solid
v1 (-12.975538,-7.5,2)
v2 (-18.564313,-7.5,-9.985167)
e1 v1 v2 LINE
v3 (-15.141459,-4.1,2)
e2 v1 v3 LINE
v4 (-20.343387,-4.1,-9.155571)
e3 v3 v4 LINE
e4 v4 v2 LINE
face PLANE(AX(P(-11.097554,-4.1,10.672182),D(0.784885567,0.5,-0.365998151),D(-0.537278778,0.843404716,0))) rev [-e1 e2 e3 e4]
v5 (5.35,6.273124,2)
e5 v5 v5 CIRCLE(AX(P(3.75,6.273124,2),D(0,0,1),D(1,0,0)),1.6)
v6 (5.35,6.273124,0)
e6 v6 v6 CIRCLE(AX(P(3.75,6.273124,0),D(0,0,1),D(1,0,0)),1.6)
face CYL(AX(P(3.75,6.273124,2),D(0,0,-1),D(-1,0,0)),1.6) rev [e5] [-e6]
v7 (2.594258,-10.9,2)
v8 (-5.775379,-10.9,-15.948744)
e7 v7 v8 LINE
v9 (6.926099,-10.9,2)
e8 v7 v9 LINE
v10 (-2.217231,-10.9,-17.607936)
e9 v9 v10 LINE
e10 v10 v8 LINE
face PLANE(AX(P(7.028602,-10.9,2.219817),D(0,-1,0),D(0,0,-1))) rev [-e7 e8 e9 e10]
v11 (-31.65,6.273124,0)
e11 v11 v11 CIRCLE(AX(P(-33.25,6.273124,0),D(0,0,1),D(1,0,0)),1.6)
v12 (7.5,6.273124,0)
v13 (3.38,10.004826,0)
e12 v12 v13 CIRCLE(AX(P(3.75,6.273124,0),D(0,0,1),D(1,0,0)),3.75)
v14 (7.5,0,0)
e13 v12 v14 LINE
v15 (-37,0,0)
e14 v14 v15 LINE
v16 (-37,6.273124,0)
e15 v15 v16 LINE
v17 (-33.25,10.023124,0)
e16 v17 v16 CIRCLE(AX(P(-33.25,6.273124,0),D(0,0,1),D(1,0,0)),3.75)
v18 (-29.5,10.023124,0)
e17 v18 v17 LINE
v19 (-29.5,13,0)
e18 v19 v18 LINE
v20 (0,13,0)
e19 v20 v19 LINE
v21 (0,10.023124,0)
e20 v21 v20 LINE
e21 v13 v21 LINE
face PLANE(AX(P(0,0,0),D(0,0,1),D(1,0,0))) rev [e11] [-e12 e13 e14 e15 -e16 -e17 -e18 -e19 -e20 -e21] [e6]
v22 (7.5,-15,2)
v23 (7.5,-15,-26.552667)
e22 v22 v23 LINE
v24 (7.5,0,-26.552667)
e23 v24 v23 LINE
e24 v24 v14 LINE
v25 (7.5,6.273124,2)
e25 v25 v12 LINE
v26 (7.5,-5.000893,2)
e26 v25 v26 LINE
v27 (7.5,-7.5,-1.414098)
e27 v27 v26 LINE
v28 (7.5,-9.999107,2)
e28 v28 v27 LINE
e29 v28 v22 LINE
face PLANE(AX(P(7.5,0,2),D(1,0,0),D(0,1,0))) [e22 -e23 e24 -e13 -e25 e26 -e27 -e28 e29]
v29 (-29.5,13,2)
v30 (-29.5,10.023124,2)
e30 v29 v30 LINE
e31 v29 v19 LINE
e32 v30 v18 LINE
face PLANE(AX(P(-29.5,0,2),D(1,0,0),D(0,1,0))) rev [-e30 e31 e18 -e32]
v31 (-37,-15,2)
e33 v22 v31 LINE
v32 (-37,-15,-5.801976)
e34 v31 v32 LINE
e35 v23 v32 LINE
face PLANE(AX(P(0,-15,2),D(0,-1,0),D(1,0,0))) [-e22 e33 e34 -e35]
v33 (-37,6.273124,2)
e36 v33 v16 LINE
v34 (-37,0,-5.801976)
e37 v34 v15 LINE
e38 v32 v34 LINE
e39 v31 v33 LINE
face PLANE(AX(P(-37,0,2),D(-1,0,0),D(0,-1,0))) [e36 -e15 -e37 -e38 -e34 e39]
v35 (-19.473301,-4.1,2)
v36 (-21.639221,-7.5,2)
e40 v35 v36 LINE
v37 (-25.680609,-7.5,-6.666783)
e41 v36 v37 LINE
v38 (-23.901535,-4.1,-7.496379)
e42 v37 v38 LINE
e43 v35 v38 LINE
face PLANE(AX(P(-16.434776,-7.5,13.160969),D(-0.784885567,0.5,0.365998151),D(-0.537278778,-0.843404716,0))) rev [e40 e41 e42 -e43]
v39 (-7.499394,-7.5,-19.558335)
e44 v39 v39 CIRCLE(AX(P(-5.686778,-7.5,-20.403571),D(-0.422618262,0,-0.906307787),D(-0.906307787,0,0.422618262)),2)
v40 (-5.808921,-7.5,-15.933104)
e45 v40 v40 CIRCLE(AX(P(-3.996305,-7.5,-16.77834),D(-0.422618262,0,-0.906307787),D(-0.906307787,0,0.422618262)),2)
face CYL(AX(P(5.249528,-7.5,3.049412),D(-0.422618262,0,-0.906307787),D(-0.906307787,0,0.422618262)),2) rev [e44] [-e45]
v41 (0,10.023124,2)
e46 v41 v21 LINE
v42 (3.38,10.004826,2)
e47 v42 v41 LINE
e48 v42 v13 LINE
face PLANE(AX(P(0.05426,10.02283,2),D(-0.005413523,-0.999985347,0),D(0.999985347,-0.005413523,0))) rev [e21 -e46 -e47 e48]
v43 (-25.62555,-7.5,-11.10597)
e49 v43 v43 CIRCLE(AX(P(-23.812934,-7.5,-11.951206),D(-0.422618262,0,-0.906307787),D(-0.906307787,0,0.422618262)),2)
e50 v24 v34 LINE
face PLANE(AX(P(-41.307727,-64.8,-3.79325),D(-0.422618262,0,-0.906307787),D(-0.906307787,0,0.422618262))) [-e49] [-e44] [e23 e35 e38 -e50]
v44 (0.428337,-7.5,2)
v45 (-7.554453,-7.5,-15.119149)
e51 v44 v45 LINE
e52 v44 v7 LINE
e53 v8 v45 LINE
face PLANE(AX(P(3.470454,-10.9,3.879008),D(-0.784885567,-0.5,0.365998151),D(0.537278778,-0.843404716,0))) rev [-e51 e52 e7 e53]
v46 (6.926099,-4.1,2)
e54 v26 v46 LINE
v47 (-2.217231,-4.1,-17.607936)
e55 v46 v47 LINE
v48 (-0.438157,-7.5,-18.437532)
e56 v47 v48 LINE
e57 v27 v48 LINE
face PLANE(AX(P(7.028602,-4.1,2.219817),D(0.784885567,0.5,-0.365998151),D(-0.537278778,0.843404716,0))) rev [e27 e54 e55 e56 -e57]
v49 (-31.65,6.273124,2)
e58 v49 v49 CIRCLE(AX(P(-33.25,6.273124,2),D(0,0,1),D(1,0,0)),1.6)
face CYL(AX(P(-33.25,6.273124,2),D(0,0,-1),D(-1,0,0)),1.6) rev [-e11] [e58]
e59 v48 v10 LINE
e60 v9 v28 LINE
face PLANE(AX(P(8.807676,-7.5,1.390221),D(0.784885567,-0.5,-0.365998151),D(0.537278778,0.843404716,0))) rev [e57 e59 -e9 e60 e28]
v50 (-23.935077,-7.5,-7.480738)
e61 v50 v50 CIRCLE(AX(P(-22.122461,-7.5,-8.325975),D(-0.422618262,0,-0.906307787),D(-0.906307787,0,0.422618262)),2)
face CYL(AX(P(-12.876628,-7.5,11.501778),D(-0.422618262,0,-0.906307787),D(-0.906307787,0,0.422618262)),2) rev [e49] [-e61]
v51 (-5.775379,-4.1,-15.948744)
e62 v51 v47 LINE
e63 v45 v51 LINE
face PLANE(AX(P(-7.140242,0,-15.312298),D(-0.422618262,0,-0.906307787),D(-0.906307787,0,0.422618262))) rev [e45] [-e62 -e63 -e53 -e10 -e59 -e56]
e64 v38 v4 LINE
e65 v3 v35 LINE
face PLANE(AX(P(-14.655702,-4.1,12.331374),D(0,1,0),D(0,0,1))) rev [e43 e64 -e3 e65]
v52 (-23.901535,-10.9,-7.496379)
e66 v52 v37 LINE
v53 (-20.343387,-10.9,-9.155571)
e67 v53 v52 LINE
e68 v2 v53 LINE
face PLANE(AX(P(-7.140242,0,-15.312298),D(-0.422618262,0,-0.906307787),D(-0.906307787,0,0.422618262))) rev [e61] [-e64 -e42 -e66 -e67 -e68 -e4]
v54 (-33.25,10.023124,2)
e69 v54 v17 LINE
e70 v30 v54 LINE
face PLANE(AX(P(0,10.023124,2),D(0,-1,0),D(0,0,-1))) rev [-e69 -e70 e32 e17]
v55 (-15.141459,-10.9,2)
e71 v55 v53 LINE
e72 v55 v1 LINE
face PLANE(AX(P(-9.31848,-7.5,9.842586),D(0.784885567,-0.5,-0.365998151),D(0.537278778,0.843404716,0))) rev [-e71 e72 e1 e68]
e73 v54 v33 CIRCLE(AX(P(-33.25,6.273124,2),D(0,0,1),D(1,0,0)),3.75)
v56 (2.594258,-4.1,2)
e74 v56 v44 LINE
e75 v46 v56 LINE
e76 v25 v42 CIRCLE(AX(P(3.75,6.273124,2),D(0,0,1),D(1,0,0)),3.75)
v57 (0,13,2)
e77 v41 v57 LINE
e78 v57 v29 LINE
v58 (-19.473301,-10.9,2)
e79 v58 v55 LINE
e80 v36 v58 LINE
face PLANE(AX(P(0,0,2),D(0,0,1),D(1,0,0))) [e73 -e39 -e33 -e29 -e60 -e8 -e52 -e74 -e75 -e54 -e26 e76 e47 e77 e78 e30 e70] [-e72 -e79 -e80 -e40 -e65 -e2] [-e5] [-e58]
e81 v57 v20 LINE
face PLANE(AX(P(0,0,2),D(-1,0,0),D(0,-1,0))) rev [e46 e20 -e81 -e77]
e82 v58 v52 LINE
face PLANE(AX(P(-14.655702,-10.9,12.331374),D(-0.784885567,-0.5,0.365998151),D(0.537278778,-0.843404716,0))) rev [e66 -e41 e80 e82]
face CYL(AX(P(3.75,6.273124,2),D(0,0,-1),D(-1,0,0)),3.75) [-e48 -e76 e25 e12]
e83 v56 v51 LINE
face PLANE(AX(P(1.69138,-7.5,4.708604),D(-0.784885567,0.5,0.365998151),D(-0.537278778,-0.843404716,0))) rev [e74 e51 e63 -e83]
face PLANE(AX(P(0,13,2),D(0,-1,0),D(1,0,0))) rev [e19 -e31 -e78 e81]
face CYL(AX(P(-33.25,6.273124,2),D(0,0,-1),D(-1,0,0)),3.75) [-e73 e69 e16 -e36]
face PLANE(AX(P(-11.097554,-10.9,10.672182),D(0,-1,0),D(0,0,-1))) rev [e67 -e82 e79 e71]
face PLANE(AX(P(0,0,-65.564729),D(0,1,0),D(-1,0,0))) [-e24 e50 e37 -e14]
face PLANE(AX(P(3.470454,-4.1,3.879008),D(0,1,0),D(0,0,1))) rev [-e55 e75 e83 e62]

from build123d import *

# Parameters (mm, degrees)
SKETCH1_R           = 3.75
SKETCH1_R_2         = 1.6
BOSS_EXTRUDE1_DEPTH = 2
BOSS_EXTRUDE2_START = -15
BOSS_EXTRUDE2_DEPTH = 15
BOSS_EXTRUDE3_DEPTH = 2
SKETCH2_R           = 2
CUT_EXTRUDE1_DEPTH  = 39.169212171
CUT_EXTRUDE2_START  = -4
SKETCH2_3_R         = 2
CUT_EXTRUDE2_DEPTH  = 35.169212171


# Read off the part's stored shape, not the designer's step: Boss-Extrude2
with BuildPart() as part:
    # Sketch1 → Boss-Extrude1 (new body)
    # profile 1 of 5: a face of its own
    with BuildSketch(Plane.XY):
        with Locations((-33.25, 6.273123532)):
            Circle(SKETCH1_R)
        with Locations((-33.25, 6.273123532)):
            Circle(SKETCH1_R_2, mode=Mode.SUBTRACT)
    # profile 2 of 5: a face of its own
    with BuildSketch(Plane.XY):
        with BuildLine():
            Line((0, 2.523123532), (3.75, 2.523123532))
            ThreePointArc((3.75, 2.523123532), (0.004577287, 6.087897443), (3.38, 10.004825556))
            Line((3.38, 10.004825556), (0, 10.023123532))
            Line((0, 10.023123532), (0, 13))
            Line((0, 13), (-29.5, 13))
            Line((-29.5, 13), (-29.5, 10.023123532))
            Line((-29.5, 10.023123532), (-33.25, 10.023123532))
            ThreePointArc((-33.25, 10.023123532), (-30.598349571, 8.924773961), (-29.5, 6.273123532))
            ThreePointArc((-29.5, 6.273123532), (-30.598349571, 3.621473102), (-33.25, 2.523123532))
            Line((-33.25, 2.523123532), (-29.5, 2.523123532))
            Line((-29.5, 2.523123532), (-29.5, 0))
            Line((-29.5, 0), (0, 0))
            Line((0, 0), (0, 2.523123532))
        make_face()
    # profile 3 of 5: a face of its own
    with BuildSketch(Plane.XY):
        with Locations((3.75, 6.273123532)):
            Circle(SKETCH1_R)
        with Locations((3.75, 6.273123532)):
            Circle(SKETCH1_R_2, mode=Mode.SUBTRACT)
    # profile 4 of 5: a face of its own
    with BuildSketch(Plane.XY):
        with BuildLine():
            ThreePointArc((7.5, 6.273123532), (6.401650429, 3.621473102), (3.75, 2.523123532))
            Line((3.75, 2.523123532), (0, 2.523123532))
            Line((0, 2.523123532), (0, 0))
            Line((0, 0), (7.5, 0))
            Line((7.5, 0), (7.5, 6.273123532))
        make_face()
    # profile 5 of 5: a face of its own
    with BuildSketch(Plane.XY):
        with BuildLine():
            Line((-37, 0), (-29.5, 0))
            Line((-29.5, 0), (-29.5, 2.523123532))
            Line((-29.5, 2.523123532), (-33.25, 2.523123532))
            ThreePointArc((-33.25, 2.523123532), (-35.901650429, 3.621473102), (-37, 6.273123532))
            Line((-37, 6.273123532), (-37, 0))
        make_face()
    extrude(amount=BOSS_EXTRUDE1_DEPTH)



with BuildPart() as body_2:
    # Boss-Extrude2 outline → Boss-Extrude2 (new body)
    with BuildSketch(Plane(origin=(0, 0, 0), x_dir=(1, 0, 0), z_dir=(0, 1, 0)).offset(BOSS_EXTRUDE2_START)):
        Polygon((7.5, 0), (7.5, 26.552667029), (-37, 5.801976241), (-37, 0), align=None)
    extrude(amount=BOSS_EXTRUDE2_DEPTH)


with BuildPart() as part_1:
    add(part.part)

    add(body_2.part)  # Boss-Extrude3 merges body 2
    # Sketch1<5> → Boss-Extrude3 (add)
    with BuildSketch(Plane.XY):
        Polygon((7.5, 0), (0, 0), (-29.5, 0), (-37, 0), (-37, -15), (7.5, -15), align=None)
    extrude(amount=BOSS_EXTRUDE3_DEPTH)

    # Sketch2 → Cut-Extrude1 (cut, through all)
    with BuildSketch(Plane(origin=(-8.83071505, 0, -18.937529538), x_dir=(-0.9063077870366508, 0, 0.42261826174069766), z_dir=(-0.4226182617406977, 1.198406961524809e-15, -0.9063077870366509))):
        with Locations((16.531049613, -7.5)):
            Circle(SKETCH2_R)
        with Locations((-3.468950387, -7.5)):
            Circle(SKETCH2_R)
    extrude(amount=-CUT_EXTRUDE1_DEPTH, mode=Mode.SUBTRACT)

    # Sketch2<3> → Cut-Extrude2 (cut, through all)
    # profile 1 of 2: a face of its own
    with BuildSketch(Plane(origin=(-8.83071505, 0, -18.937529538), x_dir=(-0.9063077870366508, 0, 0.42261826174069766), z_dir=(-0.4226182617406977, 1.198406961524809e-15, -0.9063077870366509)).offset(CUT_EXTRUDE2_START)):
        Polygon((12.605067782, -7.5), (14.568058697, -10.9), (18.494040528, -10.9), (20.457031443, -7.5), (18.494040528, -4.1), (14.568058697, -4.1), align=None)
        with Locations((16.531049613, -7.5)):
            Circle(SKETCH2_3_R, mode=Mode.SUBTRACT)
    # profile 2 of 2: a face of its own
    with BuildSketch(Plane(origin=(-8.83071505, 0, -18.937529538), x_dir=(-0.9063077870366508, 0, 0.42261826174069766), z_dir=(-0.4226182617406977, 1.198406961524809e-15, -0.9063077870366509)).offset(CUT_EXTRUDE2_START)):
        Polygon((-5.431941303, -4.1), (-7.394932218, -7.5), (-5.431941303, -10.9), (-1.505959472, -10.9), (0.457031443, -7.5), (-1.505959472, -4.1), align=None)
        with Locations((-3.468950387, -7.5)):
            Circle(SKETCH2_3_R, mode=Mode.SUBTRACT)
    extrude(amount=-CUT_EXTRUDE2_DEPTH, mode=Mode.SUBTRACT)


solid = part_1.part
